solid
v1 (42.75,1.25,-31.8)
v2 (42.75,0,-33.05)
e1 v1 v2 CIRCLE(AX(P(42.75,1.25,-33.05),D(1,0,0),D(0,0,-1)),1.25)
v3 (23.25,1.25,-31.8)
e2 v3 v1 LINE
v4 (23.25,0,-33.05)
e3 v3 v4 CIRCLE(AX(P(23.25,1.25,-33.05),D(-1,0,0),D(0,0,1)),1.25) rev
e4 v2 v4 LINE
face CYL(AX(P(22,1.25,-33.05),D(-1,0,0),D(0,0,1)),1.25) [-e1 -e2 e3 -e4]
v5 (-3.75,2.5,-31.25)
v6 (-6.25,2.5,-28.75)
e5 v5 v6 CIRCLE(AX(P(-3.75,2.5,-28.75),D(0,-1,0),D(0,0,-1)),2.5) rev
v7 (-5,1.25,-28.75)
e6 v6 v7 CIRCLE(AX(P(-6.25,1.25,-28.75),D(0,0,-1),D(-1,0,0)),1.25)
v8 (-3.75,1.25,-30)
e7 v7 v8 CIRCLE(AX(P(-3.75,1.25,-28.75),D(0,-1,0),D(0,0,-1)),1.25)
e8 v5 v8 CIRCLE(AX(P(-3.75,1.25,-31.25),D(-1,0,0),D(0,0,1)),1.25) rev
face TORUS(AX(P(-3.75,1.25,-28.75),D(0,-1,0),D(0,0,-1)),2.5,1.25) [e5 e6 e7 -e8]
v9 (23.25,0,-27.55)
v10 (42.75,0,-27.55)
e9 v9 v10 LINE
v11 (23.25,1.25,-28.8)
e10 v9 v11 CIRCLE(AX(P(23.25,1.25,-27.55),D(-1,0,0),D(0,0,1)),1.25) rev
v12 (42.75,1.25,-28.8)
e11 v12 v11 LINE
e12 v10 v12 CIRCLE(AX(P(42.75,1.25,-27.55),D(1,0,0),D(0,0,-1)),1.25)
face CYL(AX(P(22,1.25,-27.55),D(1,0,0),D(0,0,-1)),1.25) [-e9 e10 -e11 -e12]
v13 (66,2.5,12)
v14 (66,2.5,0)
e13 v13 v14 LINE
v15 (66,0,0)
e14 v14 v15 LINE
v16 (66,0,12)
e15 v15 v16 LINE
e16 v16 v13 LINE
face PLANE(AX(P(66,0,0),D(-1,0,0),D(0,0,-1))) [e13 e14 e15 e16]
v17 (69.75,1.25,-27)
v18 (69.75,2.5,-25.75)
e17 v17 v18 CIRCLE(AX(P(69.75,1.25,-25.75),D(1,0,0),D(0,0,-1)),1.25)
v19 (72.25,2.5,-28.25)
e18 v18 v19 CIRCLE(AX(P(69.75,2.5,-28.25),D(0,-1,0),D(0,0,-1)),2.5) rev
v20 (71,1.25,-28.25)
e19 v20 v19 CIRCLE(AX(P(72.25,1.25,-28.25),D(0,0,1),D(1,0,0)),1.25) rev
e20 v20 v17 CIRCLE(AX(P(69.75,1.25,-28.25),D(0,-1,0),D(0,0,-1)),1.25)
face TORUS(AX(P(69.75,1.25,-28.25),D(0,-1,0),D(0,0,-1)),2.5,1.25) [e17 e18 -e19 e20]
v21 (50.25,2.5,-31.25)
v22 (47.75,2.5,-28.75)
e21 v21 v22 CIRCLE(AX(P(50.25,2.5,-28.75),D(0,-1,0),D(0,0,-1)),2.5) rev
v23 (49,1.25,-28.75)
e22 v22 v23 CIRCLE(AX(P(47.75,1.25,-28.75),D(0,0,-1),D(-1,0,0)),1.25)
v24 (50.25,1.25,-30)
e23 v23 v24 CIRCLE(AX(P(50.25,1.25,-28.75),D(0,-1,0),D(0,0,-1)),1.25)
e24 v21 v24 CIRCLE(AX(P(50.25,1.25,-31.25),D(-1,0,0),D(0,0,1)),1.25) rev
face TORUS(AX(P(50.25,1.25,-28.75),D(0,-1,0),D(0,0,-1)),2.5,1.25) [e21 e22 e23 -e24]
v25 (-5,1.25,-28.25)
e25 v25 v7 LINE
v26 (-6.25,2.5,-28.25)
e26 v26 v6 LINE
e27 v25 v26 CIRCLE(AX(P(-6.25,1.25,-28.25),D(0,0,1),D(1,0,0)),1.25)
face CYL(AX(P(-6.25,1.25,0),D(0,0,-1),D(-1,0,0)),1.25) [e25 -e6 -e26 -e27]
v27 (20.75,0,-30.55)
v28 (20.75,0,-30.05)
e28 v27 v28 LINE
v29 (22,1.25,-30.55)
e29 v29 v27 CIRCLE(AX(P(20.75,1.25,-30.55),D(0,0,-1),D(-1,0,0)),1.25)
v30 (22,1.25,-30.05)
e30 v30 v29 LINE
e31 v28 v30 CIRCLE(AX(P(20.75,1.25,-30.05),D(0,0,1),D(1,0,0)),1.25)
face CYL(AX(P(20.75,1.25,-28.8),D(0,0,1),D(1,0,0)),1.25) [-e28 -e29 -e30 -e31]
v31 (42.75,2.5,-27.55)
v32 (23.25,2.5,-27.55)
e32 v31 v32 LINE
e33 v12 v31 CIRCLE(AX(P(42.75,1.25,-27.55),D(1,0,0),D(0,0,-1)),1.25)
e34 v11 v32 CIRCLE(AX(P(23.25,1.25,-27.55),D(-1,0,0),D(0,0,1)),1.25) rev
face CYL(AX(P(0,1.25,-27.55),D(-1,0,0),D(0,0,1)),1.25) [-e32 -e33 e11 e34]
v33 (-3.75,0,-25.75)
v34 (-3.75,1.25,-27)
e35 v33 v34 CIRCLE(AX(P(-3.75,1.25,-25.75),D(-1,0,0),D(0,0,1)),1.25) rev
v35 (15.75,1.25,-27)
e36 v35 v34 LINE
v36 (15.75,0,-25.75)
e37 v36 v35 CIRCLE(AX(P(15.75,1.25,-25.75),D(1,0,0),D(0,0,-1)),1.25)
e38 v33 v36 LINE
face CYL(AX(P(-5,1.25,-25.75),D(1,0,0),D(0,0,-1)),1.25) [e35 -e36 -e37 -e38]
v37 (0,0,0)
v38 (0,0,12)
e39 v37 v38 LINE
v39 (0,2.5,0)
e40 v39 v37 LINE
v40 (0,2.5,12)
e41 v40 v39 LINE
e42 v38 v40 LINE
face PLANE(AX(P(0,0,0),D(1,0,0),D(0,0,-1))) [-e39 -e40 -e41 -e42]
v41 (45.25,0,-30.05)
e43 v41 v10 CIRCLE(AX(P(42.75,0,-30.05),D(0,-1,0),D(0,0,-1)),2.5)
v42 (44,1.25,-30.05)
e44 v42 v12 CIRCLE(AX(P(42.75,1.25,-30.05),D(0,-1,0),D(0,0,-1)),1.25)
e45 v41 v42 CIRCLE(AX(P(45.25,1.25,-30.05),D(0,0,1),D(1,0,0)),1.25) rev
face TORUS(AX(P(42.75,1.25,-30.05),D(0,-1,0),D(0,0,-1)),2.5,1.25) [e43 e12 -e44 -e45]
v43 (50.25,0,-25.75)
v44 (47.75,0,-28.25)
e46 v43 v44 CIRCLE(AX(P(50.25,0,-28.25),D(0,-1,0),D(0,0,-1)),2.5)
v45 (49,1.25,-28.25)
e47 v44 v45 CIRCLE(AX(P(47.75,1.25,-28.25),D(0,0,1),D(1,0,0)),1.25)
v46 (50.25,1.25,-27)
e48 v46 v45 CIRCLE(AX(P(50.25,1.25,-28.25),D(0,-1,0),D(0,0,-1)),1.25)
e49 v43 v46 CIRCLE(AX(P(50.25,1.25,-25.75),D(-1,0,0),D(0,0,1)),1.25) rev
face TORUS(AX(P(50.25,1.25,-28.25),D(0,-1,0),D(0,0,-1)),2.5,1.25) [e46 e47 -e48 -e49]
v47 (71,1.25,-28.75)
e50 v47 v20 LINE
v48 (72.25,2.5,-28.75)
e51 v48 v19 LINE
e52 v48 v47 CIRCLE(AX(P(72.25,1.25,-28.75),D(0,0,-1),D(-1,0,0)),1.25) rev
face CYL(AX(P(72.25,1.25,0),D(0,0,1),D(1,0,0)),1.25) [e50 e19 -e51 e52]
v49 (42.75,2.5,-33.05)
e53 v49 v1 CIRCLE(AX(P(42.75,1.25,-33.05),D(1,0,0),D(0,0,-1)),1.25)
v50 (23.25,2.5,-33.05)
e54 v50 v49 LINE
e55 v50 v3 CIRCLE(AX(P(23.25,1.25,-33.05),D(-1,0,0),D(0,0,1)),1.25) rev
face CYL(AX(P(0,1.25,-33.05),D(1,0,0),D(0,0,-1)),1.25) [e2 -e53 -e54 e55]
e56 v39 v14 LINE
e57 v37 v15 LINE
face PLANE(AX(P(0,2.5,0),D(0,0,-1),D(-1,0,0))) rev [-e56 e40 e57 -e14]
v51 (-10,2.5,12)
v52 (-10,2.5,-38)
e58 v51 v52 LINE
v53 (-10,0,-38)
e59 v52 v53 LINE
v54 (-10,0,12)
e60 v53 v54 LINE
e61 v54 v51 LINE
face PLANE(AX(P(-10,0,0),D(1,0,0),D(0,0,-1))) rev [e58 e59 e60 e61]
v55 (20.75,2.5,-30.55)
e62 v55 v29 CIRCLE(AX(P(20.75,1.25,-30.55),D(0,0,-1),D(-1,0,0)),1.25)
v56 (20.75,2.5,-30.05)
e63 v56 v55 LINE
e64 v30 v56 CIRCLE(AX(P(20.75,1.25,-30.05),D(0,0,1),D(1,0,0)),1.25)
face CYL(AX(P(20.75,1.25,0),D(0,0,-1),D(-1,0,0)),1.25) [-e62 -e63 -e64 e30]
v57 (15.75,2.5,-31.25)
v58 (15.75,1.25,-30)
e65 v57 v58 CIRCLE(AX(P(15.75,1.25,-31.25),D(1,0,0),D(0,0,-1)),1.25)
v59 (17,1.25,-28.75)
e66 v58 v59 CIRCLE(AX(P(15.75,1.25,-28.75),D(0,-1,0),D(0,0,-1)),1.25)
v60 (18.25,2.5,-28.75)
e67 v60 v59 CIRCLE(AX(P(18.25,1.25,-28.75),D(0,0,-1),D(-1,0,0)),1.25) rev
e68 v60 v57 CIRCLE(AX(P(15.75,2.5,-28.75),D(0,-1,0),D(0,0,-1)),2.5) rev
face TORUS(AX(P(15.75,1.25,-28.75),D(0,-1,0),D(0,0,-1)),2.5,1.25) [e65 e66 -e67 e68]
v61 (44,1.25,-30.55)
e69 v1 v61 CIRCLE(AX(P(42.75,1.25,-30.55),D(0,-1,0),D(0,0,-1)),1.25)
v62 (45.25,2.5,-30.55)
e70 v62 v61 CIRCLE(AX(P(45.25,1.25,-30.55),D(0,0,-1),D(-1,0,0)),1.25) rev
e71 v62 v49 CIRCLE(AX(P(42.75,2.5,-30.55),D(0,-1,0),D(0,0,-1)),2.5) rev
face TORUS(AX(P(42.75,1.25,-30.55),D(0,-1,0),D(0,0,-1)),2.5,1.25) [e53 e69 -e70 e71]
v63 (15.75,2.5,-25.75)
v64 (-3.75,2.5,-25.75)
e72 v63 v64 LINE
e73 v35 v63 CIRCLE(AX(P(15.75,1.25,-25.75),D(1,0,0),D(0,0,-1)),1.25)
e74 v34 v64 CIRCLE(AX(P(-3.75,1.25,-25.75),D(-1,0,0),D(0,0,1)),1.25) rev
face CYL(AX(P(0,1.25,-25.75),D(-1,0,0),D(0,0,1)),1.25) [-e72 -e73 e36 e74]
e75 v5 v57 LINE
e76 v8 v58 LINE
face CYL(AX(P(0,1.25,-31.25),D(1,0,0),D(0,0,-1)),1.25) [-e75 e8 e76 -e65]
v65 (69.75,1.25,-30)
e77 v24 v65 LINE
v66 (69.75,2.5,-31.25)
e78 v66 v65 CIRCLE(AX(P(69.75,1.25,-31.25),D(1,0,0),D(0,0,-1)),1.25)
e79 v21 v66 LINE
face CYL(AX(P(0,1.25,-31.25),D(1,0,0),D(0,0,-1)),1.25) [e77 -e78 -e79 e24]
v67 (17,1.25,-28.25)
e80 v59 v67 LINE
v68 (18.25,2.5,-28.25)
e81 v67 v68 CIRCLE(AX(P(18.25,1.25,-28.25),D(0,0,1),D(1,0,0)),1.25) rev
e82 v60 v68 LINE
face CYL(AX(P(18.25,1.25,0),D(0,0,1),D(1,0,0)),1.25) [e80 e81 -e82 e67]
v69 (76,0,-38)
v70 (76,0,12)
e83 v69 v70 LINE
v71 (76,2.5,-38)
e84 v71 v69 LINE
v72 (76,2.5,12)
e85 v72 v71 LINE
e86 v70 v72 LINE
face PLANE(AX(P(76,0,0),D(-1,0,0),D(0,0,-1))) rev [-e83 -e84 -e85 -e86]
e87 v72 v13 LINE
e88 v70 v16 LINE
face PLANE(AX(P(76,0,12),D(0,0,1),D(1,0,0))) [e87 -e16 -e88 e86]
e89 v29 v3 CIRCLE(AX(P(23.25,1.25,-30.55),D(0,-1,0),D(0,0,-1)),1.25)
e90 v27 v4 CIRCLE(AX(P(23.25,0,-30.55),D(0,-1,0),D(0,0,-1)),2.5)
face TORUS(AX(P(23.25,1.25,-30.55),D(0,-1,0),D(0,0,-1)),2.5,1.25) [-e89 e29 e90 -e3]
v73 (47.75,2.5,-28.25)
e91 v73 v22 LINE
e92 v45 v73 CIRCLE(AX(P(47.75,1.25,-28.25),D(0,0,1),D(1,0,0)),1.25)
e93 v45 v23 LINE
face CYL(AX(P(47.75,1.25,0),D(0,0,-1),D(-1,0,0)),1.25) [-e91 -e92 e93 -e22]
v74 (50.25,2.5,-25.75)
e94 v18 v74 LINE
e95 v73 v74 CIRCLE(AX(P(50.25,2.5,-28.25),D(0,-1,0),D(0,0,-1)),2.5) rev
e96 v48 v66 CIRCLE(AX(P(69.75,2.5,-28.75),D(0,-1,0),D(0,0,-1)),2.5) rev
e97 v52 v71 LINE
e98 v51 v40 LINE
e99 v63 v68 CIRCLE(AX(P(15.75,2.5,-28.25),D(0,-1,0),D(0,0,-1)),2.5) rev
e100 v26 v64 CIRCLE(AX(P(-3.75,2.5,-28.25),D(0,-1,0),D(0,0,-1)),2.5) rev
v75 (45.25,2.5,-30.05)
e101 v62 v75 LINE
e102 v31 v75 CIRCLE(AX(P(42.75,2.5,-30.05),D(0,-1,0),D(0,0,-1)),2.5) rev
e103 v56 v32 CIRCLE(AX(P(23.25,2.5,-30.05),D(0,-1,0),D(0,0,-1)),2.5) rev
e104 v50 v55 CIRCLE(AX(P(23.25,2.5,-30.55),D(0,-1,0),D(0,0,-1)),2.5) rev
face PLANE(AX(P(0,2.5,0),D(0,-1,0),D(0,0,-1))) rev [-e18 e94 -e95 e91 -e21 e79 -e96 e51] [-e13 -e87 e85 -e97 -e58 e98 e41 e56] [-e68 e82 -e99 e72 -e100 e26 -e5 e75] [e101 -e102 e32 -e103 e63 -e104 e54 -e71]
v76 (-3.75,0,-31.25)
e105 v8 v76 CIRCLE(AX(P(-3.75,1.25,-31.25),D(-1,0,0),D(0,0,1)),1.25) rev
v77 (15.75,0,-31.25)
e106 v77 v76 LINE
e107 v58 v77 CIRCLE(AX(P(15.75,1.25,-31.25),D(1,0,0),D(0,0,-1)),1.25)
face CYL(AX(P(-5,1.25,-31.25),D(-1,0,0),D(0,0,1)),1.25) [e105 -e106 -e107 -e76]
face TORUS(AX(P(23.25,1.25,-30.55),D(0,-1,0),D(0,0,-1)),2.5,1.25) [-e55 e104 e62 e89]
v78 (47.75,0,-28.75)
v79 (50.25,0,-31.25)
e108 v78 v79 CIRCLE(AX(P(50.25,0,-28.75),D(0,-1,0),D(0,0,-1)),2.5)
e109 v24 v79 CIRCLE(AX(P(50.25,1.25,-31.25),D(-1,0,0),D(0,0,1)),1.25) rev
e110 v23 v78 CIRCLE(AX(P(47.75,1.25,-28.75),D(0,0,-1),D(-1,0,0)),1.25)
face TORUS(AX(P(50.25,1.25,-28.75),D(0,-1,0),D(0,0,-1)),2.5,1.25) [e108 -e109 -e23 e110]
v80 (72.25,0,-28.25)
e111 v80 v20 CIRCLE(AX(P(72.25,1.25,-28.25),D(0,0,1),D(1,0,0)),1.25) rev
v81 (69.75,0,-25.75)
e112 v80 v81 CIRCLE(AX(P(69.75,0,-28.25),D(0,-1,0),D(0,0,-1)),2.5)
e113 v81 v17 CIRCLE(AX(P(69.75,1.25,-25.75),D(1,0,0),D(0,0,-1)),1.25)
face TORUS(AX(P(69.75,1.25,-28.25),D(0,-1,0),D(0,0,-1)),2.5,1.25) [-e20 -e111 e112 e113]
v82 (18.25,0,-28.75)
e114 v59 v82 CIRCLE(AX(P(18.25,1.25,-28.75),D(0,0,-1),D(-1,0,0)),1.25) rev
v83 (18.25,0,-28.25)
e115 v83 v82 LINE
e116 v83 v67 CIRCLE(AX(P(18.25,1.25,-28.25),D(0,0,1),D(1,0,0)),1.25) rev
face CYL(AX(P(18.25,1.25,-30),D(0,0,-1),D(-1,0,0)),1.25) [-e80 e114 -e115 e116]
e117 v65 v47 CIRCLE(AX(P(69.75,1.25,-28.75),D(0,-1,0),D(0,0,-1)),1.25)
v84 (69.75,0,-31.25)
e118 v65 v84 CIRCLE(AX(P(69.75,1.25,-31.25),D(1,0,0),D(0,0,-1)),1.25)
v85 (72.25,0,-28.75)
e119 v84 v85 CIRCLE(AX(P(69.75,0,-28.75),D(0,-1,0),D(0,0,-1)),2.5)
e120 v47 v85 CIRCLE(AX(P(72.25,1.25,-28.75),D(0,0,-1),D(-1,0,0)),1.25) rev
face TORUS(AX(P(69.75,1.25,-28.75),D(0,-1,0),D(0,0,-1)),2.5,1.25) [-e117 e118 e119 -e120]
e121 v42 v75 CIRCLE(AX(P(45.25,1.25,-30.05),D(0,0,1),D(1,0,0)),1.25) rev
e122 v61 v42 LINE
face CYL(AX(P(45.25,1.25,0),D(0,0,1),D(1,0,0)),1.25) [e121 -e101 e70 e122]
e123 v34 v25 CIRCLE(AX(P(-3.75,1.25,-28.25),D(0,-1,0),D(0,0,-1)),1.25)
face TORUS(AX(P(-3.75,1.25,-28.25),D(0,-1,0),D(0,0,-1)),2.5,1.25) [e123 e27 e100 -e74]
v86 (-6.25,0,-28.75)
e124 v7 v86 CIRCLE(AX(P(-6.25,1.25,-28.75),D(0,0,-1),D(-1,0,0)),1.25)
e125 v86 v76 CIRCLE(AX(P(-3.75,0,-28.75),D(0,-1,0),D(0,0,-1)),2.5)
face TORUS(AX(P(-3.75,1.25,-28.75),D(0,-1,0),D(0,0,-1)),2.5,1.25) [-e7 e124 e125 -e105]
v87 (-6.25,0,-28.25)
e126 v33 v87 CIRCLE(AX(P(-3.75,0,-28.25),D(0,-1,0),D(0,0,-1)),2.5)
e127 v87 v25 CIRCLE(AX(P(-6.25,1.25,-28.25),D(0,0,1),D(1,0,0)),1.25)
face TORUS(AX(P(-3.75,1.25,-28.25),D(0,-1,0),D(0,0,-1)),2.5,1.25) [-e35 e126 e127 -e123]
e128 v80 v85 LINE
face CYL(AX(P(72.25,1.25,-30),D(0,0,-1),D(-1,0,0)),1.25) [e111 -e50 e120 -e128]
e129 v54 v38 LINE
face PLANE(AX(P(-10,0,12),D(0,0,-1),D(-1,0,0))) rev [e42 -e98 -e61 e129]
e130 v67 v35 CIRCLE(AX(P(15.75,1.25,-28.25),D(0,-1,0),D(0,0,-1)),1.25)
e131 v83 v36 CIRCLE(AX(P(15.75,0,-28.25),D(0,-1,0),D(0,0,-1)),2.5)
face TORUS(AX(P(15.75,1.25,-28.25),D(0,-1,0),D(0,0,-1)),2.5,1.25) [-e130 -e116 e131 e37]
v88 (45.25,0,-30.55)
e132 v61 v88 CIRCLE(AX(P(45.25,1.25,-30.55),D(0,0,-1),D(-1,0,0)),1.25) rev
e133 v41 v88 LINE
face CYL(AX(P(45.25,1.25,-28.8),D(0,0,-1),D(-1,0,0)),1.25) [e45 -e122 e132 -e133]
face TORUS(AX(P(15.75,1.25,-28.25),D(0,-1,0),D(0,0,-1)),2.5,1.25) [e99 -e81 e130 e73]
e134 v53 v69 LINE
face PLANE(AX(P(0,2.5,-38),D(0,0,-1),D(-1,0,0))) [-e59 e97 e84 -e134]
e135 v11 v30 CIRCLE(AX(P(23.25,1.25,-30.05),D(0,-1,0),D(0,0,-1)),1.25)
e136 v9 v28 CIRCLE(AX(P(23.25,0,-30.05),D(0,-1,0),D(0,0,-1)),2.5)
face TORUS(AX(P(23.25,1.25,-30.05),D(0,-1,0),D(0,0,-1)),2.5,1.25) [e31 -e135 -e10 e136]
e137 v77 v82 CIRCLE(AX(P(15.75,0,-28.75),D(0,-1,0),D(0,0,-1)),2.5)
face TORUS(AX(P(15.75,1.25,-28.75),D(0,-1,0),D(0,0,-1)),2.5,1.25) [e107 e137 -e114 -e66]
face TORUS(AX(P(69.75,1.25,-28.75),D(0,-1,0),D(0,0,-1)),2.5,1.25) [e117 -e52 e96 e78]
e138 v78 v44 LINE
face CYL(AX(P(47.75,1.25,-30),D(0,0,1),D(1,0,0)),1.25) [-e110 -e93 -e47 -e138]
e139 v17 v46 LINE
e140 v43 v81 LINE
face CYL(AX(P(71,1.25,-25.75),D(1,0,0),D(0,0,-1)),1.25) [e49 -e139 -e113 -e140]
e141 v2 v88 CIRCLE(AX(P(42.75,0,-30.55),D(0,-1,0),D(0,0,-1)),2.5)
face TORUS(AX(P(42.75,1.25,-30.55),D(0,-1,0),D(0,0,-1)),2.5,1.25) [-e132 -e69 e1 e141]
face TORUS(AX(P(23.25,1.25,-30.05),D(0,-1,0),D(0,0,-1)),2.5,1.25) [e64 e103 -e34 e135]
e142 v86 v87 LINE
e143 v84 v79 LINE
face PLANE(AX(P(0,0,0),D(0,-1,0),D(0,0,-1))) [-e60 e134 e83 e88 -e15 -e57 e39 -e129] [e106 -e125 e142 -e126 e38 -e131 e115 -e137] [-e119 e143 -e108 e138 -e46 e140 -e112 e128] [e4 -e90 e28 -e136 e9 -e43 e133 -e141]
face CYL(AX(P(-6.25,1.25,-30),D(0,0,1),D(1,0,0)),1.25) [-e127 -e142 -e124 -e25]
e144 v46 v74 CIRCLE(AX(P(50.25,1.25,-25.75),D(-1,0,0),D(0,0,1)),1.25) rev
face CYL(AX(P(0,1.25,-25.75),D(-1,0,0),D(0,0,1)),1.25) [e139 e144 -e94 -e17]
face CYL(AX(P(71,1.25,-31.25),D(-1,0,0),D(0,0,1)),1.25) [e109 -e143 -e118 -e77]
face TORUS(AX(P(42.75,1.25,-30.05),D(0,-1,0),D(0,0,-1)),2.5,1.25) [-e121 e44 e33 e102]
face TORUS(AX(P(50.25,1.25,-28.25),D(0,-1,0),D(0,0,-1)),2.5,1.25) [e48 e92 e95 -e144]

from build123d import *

# Parameters (mm, degrees)
SKETCH1_W           = 66
SKETCH1_H           = 38
BOSS_EXTRUDE1_DEPTH = 2.5
SKETCH3_W           = 50
SKETCH3_H           = 2.5
BOSS_EXTRUDE2_DEPTH = 10
SKETCH2_W           = 22
SKETCH2_H           = 3
CUT_EXTRUDE2_DEPTH  = 86.007352623
FILLET1_R           = 1.25


with BuildPart() as part:
    # Sketch1 → Boss-Extrude1 (new body)
    with BuildSketch(Plane(origin=(0, 0, 0), x_dir=(1, 0, 0), z_dir=(0, 1, 0))):
        with Locations((33, 19)):
            Rectangle(SKETCH1_W, SKETCH1_H)
    extrude(amount=BOSS_EXTRUDE1_DEPTH)

    # Sketch3 → Boss-Extrude2 (add)
    with BuildSketch(Plane.ZY):
        with Locations((-13, 1.25)):
            Rectangle(SKETCH3_W, SKETCH3_H)
    boss_extrude2 = extrude(amount=BOSS_EXTRUDE2_DEPTH)

    # Mirror1: Boss-Extrude2 across plane
    add(boss_extrude2.mirror(Plane(origin=(33, 0, 0), x_dir=(0, 0, 1), z_dir=(1, 0, 0))))

    # Sketch2 → Cut-Extrude2 (cut, through all)
    with BuildSketch(Plane.XZ):
        with Locations((33, -30.3)):
            Rectangle(SKETCH2_W, SKETCH2_H)
        with Locations((6, -28.5)):
            Rectangle(SKETCH2_W, SKETCH2_H)
        with Locations((60, -28.5)):
            Rectangle(SKETCH2_W, SKETCH2_H)
    extrude(amount=-CUT_EXTRUDE2_DEPTH, mode=Mode.SUBTRACT)

    # Fillet1
    fillet1_edges = [part.edges().sort_by_distance(p)[0] for p in [
        (71, 2.5, -28.5),
        (71, 1.25, -27),
        (60, 2.5, -30),
        (71, 1.25, -30),
        (49, 2.5, -28.5),
        (49, 1.25, -30),
        (60, 2.5, -27),
        (49, 1.25, -27),
        (71, 0, -28.5),
        (60, 0, -27),
        (49, 0, -28.5),
        (60, 0, -30),
        (-5, 2.5, -28.5),
        (-5, 1.25, -30),
        (6, 2.5, -27),
        (-5, 1.25, -27),
        (17, 2.5, -28.5),
        (17, 1.25, -27),
        (6, 2.5, -30),
        (17, 1.25, -30),
        (-5, 0, -28.5),
        (6, 0, -30),
        (17, 0, -28.5),
        (6, 0, -27),
        (22, 2.5, -30.3),
        (22, 1.25, -31.8),
        (33, 2.5, -28.8),
        (22, 1.25, -28.8),
        (44, 2.5, -30.3),
        (44, 1.25, -28.8),
        (33, 2.5, -31.8),
        (44, 1.25, -31.8),
        (22, 0, -30.3),
        (33, 0, -31.8),
        (44, 0, -30.3),
        (33, 0, -28.8),
    ]]
    fillet(fillet1_edges, radius=FILLET1_R - 0.0001)  # a hair under: the kernel refuses the full size


solid = part.part
